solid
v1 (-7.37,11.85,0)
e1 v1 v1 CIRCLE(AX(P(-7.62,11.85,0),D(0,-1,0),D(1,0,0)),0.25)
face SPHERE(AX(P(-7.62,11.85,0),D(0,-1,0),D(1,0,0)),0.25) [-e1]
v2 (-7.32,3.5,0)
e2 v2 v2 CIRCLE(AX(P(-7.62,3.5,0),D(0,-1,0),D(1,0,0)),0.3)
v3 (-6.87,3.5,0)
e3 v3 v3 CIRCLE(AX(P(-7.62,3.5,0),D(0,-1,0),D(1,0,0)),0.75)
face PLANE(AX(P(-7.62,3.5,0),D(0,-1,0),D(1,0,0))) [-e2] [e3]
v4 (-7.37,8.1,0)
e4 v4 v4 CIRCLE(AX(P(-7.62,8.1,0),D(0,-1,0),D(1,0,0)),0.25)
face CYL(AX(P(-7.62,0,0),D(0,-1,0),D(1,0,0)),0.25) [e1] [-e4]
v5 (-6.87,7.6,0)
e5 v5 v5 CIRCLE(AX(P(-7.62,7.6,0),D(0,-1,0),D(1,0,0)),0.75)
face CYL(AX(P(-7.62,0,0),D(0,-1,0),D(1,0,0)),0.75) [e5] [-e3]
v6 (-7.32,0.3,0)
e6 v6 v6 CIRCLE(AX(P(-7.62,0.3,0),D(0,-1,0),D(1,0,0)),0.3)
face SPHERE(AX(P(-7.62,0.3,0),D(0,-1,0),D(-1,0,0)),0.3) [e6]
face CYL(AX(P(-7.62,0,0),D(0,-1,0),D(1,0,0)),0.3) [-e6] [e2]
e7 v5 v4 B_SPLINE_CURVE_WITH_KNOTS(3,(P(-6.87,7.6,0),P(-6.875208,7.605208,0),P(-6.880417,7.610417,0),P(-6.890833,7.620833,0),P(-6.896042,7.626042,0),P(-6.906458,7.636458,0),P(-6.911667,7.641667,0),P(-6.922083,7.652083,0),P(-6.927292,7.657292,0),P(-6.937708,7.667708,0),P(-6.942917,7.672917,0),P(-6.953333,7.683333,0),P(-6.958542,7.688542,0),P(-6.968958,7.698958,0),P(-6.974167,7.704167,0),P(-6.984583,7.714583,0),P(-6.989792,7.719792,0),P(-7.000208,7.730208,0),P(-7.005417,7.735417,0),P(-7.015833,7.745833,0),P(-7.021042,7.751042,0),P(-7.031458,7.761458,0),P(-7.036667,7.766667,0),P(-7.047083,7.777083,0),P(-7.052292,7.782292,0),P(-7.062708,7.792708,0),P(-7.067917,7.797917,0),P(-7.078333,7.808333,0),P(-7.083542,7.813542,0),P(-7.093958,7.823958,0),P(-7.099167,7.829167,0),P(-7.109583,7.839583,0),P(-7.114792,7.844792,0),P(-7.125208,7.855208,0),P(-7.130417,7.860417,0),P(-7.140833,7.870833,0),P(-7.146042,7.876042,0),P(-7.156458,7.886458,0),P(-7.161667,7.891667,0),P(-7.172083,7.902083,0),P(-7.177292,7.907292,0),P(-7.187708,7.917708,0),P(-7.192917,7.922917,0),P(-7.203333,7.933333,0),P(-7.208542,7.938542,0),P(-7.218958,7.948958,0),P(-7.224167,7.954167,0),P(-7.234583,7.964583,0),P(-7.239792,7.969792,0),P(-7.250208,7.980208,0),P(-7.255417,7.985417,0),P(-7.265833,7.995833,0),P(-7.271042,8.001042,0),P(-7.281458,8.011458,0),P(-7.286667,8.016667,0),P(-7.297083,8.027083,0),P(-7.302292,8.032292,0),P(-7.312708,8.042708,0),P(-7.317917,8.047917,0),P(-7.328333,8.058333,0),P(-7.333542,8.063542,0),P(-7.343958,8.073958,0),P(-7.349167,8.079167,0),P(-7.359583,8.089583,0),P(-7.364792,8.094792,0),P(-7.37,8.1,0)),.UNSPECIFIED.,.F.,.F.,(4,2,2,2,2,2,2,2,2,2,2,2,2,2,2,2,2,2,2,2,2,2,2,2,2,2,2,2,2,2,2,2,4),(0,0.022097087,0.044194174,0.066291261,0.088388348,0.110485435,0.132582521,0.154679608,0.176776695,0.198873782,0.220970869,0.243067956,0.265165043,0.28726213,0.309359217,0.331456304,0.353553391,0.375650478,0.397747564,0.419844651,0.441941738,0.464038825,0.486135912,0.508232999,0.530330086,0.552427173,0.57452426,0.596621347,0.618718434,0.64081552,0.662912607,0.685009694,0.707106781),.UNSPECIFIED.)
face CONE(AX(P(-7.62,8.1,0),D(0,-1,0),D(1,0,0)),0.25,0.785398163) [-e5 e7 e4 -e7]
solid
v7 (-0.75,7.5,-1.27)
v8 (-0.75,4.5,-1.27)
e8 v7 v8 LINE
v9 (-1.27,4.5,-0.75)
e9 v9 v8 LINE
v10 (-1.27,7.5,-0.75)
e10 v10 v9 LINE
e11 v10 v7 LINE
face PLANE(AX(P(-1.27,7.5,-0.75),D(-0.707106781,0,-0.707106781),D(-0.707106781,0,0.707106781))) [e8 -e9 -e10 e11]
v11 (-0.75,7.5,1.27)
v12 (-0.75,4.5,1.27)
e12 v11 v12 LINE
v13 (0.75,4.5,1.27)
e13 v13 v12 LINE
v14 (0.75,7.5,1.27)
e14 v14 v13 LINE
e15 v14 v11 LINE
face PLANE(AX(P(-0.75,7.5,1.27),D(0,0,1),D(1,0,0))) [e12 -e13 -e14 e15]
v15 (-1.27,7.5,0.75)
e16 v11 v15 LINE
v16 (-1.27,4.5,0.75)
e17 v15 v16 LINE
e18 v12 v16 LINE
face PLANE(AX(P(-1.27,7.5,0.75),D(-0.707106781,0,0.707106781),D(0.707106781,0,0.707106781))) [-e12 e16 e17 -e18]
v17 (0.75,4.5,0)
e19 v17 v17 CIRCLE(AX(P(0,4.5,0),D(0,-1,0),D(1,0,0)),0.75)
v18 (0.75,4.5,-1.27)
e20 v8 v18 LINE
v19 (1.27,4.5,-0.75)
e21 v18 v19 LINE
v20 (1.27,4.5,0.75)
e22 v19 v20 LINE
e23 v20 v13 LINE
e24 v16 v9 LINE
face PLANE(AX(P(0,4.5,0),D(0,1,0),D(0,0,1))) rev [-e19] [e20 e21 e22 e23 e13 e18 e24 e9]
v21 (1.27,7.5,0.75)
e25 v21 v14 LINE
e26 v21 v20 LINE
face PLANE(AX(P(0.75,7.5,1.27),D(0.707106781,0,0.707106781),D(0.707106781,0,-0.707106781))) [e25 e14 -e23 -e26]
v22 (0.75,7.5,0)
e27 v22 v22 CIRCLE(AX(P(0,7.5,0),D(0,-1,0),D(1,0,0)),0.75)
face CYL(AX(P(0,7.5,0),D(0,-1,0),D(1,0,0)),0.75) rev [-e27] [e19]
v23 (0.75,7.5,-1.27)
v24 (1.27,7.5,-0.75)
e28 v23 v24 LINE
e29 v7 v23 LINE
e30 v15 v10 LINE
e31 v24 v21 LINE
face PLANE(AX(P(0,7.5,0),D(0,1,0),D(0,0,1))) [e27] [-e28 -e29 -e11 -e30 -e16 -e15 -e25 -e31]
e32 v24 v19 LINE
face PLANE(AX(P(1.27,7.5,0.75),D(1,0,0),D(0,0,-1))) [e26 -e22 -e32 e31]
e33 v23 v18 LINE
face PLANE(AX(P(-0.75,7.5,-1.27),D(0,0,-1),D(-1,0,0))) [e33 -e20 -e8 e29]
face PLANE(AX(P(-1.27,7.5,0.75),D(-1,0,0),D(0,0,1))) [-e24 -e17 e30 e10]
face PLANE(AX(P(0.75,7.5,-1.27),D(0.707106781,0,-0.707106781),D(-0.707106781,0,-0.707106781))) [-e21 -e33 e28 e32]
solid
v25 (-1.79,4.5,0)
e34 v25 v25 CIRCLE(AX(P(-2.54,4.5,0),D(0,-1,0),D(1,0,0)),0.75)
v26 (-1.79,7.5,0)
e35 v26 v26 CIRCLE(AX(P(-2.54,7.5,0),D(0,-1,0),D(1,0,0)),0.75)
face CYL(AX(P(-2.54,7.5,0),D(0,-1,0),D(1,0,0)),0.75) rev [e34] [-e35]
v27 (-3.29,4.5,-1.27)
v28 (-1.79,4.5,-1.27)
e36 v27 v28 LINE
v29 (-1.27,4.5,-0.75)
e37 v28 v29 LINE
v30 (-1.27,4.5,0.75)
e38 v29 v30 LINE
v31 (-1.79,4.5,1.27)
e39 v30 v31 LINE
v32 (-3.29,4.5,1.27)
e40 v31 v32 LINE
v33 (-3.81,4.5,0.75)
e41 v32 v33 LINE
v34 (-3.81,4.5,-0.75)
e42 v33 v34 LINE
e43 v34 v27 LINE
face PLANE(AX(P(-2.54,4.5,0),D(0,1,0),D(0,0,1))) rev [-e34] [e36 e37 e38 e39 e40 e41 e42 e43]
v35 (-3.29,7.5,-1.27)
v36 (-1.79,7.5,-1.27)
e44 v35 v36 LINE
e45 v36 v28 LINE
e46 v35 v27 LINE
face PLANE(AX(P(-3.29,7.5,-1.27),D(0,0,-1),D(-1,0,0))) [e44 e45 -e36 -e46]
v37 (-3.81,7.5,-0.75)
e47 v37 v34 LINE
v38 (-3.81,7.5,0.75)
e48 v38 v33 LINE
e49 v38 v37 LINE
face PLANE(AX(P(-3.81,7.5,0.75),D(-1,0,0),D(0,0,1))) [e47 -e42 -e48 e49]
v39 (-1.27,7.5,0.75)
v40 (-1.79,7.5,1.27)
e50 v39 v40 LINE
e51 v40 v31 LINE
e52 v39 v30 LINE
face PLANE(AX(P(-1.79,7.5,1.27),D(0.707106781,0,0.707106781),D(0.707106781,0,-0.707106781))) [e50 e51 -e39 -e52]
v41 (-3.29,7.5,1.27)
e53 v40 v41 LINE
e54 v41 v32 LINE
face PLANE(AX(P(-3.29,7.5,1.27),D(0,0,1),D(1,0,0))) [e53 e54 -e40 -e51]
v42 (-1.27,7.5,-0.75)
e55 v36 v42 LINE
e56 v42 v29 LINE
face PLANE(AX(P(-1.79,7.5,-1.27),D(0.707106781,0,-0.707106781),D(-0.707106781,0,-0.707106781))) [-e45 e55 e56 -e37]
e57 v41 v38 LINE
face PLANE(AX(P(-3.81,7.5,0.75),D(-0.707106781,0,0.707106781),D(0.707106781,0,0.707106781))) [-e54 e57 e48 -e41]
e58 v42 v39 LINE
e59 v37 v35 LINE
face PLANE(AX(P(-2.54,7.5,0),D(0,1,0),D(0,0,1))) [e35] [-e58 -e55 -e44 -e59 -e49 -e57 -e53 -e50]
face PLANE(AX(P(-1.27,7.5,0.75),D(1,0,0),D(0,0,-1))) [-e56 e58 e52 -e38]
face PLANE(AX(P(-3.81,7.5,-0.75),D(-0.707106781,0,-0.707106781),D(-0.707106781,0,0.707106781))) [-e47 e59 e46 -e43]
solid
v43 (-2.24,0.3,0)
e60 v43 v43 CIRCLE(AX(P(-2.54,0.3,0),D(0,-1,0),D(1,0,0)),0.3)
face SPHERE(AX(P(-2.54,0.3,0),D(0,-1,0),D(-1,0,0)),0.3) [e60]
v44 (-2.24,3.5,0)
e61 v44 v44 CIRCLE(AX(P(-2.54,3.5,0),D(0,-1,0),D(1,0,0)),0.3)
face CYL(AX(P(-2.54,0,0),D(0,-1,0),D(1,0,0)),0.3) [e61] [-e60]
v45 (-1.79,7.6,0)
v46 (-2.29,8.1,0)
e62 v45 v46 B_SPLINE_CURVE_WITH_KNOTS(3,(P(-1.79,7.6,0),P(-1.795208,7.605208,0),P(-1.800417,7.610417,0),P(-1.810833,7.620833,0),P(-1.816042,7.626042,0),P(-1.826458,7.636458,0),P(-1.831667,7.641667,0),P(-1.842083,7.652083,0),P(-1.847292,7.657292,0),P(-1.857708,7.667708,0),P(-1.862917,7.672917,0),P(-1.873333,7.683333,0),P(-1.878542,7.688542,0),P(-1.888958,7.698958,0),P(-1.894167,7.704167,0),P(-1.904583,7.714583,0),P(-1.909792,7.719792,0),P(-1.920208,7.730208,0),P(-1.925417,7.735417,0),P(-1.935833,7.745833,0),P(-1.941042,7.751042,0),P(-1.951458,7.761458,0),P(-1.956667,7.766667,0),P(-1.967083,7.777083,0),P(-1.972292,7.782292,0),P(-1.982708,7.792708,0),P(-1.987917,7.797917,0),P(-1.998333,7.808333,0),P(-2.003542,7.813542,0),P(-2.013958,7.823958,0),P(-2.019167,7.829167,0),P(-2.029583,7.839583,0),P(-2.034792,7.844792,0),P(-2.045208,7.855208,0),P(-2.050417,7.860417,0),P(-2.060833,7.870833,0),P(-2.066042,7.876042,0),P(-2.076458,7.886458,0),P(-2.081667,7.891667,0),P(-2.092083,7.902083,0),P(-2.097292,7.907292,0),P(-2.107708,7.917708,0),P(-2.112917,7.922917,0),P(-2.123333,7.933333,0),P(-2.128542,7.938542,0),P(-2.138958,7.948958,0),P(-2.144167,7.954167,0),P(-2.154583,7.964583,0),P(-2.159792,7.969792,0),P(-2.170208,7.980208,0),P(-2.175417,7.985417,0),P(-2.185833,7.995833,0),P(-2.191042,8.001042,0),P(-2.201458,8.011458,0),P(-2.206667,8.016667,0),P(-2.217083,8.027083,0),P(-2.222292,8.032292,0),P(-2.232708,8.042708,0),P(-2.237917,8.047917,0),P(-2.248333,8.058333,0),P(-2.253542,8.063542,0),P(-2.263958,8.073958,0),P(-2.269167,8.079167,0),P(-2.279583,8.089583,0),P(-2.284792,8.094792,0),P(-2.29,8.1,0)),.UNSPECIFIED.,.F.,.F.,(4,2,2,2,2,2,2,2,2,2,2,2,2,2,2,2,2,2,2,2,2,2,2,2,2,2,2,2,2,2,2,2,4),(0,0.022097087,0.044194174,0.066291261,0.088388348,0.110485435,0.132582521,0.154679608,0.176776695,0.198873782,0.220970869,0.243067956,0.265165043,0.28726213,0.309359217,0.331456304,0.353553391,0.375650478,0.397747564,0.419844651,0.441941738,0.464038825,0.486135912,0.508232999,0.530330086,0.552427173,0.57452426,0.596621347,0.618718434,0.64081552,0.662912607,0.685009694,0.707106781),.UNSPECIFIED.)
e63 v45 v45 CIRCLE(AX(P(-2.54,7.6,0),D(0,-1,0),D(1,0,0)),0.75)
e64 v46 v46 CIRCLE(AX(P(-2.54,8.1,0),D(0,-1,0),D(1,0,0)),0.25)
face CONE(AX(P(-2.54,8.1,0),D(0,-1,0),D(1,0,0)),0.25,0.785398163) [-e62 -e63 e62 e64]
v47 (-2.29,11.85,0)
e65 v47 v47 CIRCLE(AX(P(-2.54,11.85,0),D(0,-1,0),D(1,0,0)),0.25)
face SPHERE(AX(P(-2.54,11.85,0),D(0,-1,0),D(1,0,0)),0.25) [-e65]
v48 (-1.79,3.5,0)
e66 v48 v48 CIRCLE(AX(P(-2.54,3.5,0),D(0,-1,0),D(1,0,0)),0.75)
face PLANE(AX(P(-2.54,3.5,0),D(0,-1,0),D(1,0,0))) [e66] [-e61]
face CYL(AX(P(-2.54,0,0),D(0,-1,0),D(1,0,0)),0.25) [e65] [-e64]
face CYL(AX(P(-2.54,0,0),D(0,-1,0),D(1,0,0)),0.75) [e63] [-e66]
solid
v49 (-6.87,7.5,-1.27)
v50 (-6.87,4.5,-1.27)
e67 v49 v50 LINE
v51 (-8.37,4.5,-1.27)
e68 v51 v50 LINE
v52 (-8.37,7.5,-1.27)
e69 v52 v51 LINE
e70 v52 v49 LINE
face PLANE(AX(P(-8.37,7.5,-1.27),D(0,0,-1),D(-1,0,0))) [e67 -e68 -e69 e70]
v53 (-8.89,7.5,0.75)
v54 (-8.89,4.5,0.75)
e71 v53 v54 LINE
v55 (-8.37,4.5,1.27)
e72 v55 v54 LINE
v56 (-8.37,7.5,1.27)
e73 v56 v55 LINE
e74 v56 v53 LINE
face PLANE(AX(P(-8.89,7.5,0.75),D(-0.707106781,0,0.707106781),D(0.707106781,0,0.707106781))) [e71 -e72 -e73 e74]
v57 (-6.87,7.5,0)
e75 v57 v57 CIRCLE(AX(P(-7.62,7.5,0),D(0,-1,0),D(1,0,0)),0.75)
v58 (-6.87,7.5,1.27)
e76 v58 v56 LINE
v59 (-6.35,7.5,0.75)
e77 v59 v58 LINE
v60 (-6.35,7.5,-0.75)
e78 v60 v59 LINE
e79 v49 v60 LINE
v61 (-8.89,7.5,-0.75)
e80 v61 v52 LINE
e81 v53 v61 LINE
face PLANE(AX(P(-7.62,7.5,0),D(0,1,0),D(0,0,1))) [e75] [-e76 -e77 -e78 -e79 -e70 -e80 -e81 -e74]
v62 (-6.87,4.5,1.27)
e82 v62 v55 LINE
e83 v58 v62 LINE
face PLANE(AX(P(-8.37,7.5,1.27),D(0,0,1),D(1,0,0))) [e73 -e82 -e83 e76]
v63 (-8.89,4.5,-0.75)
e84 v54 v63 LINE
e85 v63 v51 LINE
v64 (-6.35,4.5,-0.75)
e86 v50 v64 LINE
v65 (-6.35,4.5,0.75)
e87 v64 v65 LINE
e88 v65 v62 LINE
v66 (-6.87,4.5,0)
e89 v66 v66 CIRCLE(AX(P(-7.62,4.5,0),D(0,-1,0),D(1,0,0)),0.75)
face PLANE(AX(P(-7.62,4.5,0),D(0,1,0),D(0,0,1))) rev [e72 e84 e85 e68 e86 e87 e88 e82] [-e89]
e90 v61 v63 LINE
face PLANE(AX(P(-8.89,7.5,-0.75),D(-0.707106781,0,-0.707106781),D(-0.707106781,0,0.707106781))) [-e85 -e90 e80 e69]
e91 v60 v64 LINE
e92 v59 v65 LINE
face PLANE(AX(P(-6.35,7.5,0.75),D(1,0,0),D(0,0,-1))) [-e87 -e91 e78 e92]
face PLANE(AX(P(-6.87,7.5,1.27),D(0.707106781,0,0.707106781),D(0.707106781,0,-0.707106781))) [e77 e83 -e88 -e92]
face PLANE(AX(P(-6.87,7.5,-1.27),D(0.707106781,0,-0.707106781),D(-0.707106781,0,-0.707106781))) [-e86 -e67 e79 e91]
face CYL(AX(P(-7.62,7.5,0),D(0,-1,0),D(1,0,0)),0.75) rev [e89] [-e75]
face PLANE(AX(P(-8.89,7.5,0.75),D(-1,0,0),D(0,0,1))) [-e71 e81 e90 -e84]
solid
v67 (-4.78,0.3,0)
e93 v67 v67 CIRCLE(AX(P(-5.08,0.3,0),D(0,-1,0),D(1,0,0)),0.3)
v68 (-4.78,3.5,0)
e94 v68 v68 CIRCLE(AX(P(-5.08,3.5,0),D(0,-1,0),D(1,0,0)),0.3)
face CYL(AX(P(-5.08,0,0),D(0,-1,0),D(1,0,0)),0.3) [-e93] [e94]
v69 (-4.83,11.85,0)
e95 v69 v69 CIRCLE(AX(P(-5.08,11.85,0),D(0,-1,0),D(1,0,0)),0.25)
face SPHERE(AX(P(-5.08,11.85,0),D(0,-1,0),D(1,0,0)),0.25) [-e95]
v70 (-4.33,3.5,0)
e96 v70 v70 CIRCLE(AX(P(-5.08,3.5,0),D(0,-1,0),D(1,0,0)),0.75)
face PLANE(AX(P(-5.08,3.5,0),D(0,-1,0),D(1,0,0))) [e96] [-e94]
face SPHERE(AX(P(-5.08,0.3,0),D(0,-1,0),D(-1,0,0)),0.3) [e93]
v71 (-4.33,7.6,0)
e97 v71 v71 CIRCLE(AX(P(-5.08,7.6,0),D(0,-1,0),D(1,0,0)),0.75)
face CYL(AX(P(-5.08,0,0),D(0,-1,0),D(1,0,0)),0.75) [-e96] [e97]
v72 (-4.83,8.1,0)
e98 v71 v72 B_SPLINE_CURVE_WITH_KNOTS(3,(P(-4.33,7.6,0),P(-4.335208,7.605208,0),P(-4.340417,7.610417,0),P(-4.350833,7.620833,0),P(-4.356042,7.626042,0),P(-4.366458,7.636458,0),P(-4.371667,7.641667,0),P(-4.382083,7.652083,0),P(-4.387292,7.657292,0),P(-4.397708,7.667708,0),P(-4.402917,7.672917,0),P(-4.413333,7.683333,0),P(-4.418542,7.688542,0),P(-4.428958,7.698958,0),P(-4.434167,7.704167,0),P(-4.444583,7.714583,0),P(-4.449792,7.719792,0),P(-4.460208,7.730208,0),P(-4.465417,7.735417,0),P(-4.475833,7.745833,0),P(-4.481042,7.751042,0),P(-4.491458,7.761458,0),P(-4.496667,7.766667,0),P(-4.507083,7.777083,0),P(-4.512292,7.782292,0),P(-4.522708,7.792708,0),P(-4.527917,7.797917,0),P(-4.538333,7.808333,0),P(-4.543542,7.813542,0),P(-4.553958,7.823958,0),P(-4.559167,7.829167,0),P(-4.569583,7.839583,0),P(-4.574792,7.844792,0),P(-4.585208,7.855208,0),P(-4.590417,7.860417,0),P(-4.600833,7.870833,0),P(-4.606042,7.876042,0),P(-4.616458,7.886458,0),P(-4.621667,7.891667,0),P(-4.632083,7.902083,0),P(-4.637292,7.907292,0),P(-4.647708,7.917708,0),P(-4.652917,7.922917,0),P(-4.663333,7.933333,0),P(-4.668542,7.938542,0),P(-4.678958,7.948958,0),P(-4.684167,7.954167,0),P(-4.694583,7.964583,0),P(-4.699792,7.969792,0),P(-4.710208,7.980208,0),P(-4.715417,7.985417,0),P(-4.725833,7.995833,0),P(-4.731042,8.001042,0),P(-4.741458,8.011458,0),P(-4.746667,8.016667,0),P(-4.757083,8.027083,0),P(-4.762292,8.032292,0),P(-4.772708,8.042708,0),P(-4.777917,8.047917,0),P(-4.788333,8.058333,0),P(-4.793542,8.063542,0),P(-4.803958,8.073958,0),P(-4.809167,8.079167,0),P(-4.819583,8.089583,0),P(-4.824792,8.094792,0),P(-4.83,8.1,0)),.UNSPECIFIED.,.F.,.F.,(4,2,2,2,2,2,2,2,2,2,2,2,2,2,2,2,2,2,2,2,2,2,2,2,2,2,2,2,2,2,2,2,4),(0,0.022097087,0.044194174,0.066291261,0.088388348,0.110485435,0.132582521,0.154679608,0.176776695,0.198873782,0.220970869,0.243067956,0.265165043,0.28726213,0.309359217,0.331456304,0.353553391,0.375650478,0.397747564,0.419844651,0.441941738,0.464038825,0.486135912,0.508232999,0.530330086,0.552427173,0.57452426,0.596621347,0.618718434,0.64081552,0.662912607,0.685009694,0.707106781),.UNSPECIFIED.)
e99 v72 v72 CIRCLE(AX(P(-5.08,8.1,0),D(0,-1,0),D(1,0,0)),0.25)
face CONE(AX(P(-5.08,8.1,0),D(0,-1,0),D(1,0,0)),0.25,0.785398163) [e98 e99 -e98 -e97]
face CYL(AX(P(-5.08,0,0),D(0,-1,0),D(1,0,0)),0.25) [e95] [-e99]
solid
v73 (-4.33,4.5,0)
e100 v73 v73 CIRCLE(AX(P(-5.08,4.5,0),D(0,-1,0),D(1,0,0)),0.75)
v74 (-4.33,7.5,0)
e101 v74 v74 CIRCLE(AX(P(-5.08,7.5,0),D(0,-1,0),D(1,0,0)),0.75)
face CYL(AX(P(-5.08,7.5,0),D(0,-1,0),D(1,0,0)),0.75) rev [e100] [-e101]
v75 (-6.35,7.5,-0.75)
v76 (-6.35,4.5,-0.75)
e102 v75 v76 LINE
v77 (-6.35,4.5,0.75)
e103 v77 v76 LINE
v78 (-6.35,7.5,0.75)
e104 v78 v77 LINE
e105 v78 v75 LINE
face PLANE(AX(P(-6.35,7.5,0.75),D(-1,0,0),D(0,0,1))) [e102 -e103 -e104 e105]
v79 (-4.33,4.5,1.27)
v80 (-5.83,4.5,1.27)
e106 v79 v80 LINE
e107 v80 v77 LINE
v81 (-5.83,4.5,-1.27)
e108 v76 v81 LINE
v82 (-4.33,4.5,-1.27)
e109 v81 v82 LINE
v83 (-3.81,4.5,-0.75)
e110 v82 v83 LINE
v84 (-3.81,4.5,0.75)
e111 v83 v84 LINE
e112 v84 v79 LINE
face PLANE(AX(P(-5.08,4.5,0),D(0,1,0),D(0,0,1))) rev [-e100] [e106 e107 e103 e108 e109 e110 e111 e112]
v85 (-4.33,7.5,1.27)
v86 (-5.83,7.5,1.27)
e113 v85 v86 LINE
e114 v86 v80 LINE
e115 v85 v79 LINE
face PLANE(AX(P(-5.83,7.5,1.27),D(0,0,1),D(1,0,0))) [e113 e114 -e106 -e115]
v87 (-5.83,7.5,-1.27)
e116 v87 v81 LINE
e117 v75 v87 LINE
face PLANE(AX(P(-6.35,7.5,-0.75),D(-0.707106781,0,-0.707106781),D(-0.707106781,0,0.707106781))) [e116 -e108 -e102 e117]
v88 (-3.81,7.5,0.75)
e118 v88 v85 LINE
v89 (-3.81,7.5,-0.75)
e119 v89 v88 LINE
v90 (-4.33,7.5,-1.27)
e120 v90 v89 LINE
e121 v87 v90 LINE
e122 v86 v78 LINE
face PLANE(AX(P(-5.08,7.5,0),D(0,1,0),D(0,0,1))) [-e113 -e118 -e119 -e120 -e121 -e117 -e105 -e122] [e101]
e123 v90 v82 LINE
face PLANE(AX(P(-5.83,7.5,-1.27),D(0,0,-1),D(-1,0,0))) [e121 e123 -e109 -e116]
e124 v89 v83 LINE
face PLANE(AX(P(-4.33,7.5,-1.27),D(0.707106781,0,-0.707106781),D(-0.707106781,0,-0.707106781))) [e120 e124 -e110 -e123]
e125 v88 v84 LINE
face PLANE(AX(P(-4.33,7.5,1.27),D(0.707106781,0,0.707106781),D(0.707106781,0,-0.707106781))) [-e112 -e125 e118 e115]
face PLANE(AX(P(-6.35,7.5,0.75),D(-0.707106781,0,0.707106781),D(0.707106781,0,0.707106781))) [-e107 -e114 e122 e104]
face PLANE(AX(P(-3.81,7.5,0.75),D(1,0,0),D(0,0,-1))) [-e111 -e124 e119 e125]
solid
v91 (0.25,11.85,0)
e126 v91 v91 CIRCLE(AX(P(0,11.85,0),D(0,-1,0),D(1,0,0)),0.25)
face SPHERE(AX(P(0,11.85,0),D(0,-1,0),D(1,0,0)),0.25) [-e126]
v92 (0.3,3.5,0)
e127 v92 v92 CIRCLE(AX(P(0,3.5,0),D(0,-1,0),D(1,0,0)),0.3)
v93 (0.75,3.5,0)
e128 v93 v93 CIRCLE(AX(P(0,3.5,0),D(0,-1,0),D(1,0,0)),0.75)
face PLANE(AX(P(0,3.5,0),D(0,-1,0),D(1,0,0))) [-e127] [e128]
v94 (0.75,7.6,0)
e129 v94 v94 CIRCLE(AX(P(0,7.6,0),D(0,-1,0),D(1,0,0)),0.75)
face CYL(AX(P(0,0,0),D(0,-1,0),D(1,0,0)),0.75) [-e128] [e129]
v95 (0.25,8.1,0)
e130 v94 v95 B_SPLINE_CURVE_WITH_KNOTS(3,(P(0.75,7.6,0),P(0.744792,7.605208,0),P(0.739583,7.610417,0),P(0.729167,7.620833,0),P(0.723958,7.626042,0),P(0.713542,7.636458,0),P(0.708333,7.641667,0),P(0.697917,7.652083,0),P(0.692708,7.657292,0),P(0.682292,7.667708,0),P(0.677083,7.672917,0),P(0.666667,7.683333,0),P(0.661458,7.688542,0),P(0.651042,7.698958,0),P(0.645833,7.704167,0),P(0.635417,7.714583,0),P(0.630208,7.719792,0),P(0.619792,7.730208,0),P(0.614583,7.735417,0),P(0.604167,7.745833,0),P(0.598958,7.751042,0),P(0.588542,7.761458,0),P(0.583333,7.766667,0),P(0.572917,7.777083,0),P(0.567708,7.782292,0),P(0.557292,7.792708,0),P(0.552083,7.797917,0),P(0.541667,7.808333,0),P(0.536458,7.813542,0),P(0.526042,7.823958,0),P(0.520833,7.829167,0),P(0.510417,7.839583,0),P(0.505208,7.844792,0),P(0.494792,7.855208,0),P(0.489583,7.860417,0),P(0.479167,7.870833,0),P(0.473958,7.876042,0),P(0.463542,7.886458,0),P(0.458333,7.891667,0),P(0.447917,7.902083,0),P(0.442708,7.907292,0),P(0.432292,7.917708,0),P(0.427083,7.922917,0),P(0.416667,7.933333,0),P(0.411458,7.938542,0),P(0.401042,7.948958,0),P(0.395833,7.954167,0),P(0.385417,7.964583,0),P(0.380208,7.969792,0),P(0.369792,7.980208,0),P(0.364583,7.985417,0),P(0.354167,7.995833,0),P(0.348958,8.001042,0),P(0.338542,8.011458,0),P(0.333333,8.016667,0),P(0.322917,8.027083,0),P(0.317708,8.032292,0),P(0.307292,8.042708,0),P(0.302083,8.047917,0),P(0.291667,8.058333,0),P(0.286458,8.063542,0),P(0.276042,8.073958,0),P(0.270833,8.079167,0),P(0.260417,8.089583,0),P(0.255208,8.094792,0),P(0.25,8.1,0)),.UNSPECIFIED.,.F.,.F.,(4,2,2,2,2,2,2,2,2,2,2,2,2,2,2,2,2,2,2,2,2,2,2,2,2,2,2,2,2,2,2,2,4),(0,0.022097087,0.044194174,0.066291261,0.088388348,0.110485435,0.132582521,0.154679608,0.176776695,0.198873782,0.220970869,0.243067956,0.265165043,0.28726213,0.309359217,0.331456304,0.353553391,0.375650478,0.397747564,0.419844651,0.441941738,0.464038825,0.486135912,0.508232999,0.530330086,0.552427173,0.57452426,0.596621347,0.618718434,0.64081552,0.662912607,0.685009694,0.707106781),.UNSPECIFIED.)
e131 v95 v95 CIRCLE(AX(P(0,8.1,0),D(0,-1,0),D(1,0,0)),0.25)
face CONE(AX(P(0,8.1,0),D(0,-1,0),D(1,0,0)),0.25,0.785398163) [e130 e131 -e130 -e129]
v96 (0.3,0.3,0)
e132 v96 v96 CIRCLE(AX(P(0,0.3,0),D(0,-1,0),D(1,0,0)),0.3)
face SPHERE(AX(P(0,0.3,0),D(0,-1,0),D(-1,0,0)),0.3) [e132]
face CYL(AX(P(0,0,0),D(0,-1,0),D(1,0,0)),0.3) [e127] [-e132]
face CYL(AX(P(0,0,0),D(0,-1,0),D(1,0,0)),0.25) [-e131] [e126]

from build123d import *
from build123d.topology import SkipClean

# Parameters (mm, degrees)
EXTRUDE_START          = -1
SKETCH_3_R             = 0.75
EXTRUDE_1_DEPTH        = 3
PATTERN_LINEAR_1_COUNT = 4
PATTERN_LINEAR_1_PITCH = 2.54


with BuildPart() as part:
    # Эскиз2 → Повернуть1 (revolve)
    with SkipClean():  # the faces are left unmerged after this step: merging them gives an invalid solid
        with BuildSketch(Plane.XY):
            with BuildLine():
                Line((0, 11.6), (0, 0.6))
                ThreePointArc((0, 0.6), (0.212132034, 0.512132034), (0.3, 0.3))
                Line((0.3, 0.3), (0.3, 3.5))
                Line((0.3, 3.5), (0.75, 3.5))
                Line((0.75, 3.5), (0.75, 7.6))
                Line((0.75, 7.6), (0.25, 8.1))
                Line((0.25, 8.1), (0.25, 11.85))
                ThreePointArc((0.25, 11.85), (0.176776695, 11.673223305), (0, 11.6))
            make_face()
            with BuildLine():
                ThreePointArc((0, 0.6), (-0.3, 0.3), (0, 0))
                Line((0, 0), (0, 0.6))
            make_face()
            with BuildLine():
                Line((0, 0.6), (0, 0))
                ThreePointArc((0, 0), (0.212132034, 0.087867966), (0.3, 0.3))
                ThreePointArc((0.3, 0.3), (0.212132034, 0.512132034), (0, 0.6))
            make_face()
            with BuildLine():
                ThreePointArc((0, 12.1), (-0.25, 11.85), (0, 11.6))
                Line((0, 11.6), (0, 12.1))
            make_face()
            with BuildLine():
                Line((0, 12.1), (0, 11.6))
                ThreePointArc((0, 11.6), (0.176776695, 11.673223305), (0.25, 11.85))
                ThreePointArc((0.25, 11.85), (0.176776695, 12.026776695), (0, 12.1))
            make_face()
        revolve(axis=Axis((0, 0, 0), (0, 1, 0)))
    add(part.part.scale(1), mode=Mode.REPLACE)  # the faces are merged on a copy


with BuildPart() as body_2:
    # Эскиз3 → Бобышка-Вытянуть1 (new body)
    with BuildSketch(Plane.XZ.offset(-3.5).offset(EXTRUDE_START)):
        Polygon((-0.75, 1.27), (0.75, 1.27), (1.27, 0.75), (1.27, -0.75), (0.75, -1.27), (-0.75, -1.27), (-1.27, -0.75), (-1.27, 0.75), align=None)
        Circle(SKETCH_3_R, mode=Mode.SUBTRACT)
    extrude(amount=-EXTRUDE_1_DEPTH)


with BuildPart() as pattern_linear_1_1:
    # Линейный массив1: pattern copy
    add(part.part.moved(Location(Vector(-1, 0, 0) * (1 * PATTERN_LINEAR_1_PITCH))))


with BuildPart() as pattern_linear_1_2:
    # Линейный массив1: pattern copy
    add(part.part.moved(Location(Vector(-1, 0, 0) * (2 * PATTERN_LINEAR_1_PITCH))))


with BuildPart() as pattern_linear_1_3:
    # Линейный массив1: pattern copy
    add(part.part.moved(Location(Vector(-1, 0, 0) * (3 * PATTERN_LINEAR_1_PITCH))))


with BuildPart() as pattern_linear_1_4:
    # Линейный массив1: pattern copy
    add(body_2.part.moved(Location(Vector(-1, 0, 0) * (1 * PATTERN_LINEAR_1_PITCH))))


with BuildPart() as pattern_linear_1_5:
    # Линейный массив1: pattern copy
    add(body_2.part.moved(Location(Vector(-1, 0, 0) * (2 * PATTERN_LINEAR_1_PITCH))))


with BuildPart() as pattern_linear_1_6:
    # Линейный массив1: pattern copy
    add(body_2.part.moved(Location(Vector(-1, 0, 0) * (3 * PATTERN_LINEAR_1_PITCH))))


solid = Compound([part.part, body_2.part, pattern_linear_1_1.part, pattern_linear_1_2.part, pattern_linear_1_3.part, pattern_linear_1_4.part, pattern_linear_1_5.part, pattern_linear_1_6.part])
